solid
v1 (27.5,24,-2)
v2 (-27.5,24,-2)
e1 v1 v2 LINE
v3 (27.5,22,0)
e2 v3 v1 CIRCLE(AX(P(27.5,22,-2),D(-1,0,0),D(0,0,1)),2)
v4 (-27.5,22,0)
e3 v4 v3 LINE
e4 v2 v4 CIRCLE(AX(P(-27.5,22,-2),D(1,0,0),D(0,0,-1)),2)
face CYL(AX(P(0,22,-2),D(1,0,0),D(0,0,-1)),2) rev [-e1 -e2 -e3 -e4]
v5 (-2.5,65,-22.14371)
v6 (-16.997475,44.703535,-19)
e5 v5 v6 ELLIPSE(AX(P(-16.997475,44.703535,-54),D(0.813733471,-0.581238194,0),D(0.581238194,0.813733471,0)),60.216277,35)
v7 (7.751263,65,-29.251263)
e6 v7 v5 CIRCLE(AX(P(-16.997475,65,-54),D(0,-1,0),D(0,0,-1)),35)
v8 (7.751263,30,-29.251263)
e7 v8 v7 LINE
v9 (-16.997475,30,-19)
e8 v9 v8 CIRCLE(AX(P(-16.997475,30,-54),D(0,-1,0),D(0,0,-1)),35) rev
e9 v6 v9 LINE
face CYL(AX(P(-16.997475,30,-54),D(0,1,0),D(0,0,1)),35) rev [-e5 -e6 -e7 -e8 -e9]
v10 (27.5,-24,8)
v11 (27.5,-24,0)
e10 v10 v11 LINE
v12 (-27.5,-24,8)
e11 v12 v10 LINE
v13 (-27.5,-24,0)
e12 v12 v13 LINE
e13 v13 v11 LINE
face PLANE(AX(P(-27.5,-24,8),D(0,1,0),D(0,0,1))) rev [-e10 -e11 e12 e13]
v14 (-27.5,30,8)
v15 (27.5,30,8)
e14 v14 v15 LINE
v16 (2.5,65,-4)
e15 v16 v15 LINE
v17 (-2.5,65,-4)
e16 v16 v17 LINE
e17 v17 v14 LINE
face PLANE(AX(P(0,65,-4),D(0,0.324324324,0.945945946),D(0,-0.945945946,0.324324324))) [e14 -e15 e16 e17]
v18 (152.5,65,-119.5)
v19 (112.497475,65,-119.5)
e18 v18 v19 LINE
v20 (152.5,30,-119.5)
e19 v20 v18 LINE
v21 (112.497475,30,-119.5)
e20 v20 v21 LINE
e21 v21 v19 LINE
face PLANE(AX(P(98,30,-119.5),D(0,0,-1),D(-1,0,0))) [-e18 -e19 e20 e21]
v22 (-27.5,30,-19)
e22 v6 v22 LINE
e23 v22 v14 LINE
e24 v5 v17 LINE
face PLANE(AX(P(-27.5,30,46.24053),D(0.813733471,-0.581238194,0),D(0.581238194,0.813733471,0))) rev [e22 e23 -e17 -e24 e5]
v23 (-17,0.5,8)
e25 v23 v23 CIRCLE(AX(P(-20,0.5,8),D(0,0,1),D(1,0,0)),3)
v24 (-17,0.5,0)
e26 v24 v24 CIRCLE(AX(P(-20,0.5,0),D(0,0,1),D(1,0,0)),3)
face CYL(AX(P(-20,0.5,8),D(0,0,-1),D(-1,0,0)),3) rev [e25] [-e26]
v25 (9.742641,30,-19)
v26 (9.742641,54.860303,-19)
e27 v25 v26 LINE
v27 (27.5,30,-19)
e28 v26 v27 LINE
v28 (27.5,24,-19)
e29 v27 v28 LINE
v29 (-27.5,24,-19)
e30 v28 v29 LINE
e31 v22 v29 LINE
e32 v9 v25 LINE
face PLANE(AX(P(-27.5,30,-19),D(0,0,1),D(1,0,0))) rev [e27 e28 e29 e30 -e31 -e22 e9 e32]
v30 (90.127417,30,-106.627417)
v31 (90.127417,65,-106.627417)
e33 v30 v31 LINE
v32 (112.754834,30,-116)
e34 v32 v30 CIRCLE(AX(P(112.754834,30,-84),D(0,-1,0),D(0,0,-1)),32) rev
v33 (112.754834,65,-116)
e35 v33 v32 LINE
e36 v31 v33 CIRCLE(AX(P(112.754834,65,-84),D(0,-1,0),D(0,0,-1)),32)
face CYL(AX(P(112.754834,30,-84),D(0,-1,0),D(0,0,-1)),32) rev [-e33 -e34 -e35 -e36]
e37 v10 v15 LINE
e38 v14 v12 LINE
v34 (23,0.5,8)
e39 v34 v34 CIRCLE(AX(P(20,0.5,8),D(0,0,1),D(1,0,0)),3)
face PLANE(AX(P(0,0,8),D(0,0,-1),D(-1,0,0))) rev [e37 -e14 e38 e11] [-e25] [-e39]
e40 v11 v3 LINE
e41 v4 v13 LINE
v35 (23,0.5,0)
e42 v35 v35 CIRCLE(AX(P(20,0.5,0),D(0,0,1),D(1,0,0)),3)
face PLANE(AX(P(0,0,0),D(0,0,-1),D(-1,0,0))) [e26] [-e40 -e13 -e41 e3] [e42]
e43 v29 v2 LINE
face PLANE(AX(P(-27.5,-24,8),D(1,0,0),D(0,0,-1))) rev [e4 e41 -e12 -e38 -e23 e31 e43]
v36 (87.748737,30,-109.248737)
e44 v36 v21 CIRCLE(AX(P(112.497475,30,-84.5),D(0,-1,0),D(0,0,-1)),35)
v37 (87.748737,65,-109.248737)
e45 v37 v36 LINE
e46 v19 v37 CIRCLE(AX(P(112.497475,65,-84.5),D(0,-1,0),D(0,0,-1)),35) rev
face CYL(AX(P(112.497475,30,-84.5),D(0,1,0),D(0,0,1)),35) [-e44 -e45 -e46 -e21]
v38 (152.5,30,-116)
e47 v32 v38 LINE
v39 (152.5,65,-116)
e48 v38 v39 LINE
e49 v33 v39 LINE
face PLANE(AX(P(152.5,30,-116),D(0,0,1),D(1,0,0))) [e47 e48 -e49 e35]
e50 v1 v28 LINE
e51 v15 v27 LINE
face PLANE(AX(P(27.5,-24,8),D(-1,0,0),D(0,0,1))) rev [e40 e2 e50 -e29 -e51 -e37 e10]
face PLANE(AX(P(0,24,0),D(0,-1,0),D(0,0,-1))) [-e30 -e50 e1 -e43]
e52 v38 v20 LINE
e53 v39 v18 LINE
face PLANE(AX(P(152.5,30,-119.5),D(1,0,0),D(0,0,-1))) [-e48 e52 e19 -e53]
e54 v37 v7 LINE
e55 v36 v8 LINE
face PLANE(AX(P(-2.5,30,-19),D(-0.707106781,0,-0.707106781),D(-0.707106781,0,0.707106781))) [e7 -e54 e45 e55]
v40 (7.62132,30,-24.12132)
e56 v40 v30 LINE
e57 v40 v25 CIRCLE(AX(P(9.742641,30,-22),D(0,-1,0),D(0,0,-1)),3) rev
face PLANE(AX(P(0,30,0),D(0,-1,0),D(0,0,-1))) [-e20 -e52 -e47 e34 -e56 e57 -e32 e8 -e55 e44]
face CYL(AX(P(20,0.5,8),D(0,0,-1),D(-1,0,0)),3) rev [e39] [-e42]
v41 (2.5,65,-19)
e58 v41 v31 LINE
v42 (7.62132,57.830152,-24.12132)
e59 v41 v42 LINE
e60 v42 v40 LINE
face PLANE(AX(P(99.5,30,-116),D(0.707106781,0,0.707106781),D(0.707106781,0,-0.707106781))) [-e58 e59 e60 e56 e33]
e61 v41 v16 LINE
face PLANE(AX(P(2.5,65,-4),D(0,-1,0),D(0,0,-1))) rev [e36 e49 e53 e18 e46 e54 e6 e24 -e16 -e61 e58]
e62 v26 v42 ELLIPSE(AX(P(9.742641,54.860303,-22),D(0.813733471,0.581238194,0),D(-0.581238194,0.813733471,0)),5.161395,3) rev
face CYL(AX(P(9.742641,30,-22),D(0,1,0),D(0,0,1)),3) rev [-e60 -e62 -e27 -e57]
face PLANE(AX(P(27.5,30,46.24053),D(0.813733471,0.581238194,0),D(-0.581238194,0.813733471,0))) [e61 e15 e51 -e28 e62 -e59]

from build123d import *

# Parameters (mm, degrees)
SKETCH1_W           = 55
SKETCH1_H           = 48
SKETCH1_R           = 3
BOSS_EXTRUDE1_DEPTH = 8
SKETCH2_W           = 55
SKETCH2_H           = 27
BOSS_EXTRUDE2_DEPTH = 6
SKETCH3_W           = 15
SKETCH3_H           = 35
BOSS_EXTRUDE3_DEPTH = 2.5
FILLET1_R           = 2
RIB1_REACH          = 75.091
SKETCH4_WALL_W      = 185.181394164
SKETCH4_WALL_H      = 5
BOSS_EXTRUDE5_REACH = 77.566
BOSS_EXTRUDE6_DEPTH = 35
FILLET3_R           = 35
FILLET4_R           = 32
FILLET5_R           = 35
FILLET6_R           = 3


with BuildPart() as part:
    # Sketch1 → Boss-Extrude1 (new body)
    with BuildSketch(Plane.XY):
        Rectangle(SKETCH1_W, SKETCH1_H)
        with Locations((20, 0.5)):
            Circle(SKETCH1_R, mode=Mode.SUBTRACT)
        with Locations((-20, 0.5)):
            Circle(SKETCH1_R, mode=Mode.SUBTRACT)
    extrude(amount=BOSS_EXTRUDE1_DEPTH)

    # Sketch2 → Boss-Extrude2 (add)
    with BuildSketch(Plane(origin=(0, 24, 0), x_dir=(1, 0, 0), z_dir=(0, 1, 0))):
        with Locations((0, 5.5)):
            Rectangle(SKETCH2_W, SKETCH2_H)
    extrude(amount=BOSS_EXTRUDE2_DEPTH)

    # Sketch3 → Boss-Extrude3 (add, symmetric)
    with BuildSketch(Plane(origin=(0, 0, 0), x_dir=(0, 0, -1), z_dir=(1, 0, 0))):
        with Locations((11.5, 47.5)):
            Rectangle(SKETCH3_W, SKETCH3_H)
    extrude(amount=BOSS_EXTRUDE3_DEPTH, both=True)

    # Fillet1
    fillet1_edges = [part.edges().sort_by_distance(p)[0] for p in [
        (0, 24, 0),
    ]]
    fillet(fillet1_edges, radius=FILLET1_R)

    # Sketch4 wall → Rib1 (add, up to next)
    with BuildSketch(Plane(origin=(0, 47.5, 2), x_dir=(0, -0.945945945946, 0.324324324324), z_dir=(0, -0.324324324324, -0.945945945946)), mode=Mode.PRIVATE) as rib1_sk1:
        Rectangle(SKETCH4_WALL_W, SKETCH4_WALL_H)
    rib1_tool1 = extrude(rib1_sk1.sketch, amount=RIB1_REACH, mode=Mode.PRIVATE) - part.part
    add(rib1_tool1.solids().sort_by_distance((0, 47.5, 2))[0])

    # Boss-Extrude5: up to this plane
    boss_extrude5_end = Plane(origin=(0, 65, -4), z_dir=(0, 0.3243243243243244, 0.945945945945946))
    # Sketch5 → Boss-Extrude5 (add, up to the surface)
    with BuildSketch(Plane(origin=(0, 0, -19), x_dir=(-1, 0, 0), z_dir=(0, 0, -1)), mode=Mode.PRIVATE) as boss_extrude5_sk1:
        Polygon((-27.5, 30), (-2.5, 65), (-2.5, 30), align=None)
    boss_extrude5_tool1 = split(extrude(boss_extrude5_sk1.sketch, amount=-BOSS_EXTRUDE5_REACH, mode=Mode.PRIVATE), bisect_by=boss_extrude5_end, keep=Keep.BOTH, mode=Mode.PRIVATE)
    boss_extrude5 = boss_extrude5_tool1.solids().sort_by_distance((10.833333, 41.666667, -19))[0]
    add(boss_extrude5)

    # Mirror1: Boss-Extrude5 across plane
    add(boss_extrude5.mirror(Plane(origin=(0, 0, 0), x_dir=(0, 0, 1), z_dir=(1, 0, 0))))

    # Sketch7 → Boss-Extrude6 (add)
    with BuildSketch(Plane(origin=(0, 65, 0), x_dir=(1, 0, 0), z_dir=(0, 1, 0))):
        Polygon((2.5, 19), (-2.5, 19), (98, 119.5), (152.5, 119.5), (152.5, 116), (99.5, 116), align=None)
    extrude(amount=-BOSS_EXTRUDE6_DEPTH)

    # Fillet3
    fillet3_edges = [part.edges().sort_by_distance(p)[0] for p in [
        (98, 47.5, -119.5),
    ]]
    fillet(fillet3_edges, radius=FILLET3_R)

    # Fillet4
    fillet4_edges = [part.edges().sort_by_distance(p)[0] for p in [
        (99.5, 47.5, -116),
    ]]
    fillet(fillet4_edges, radius=FILLET4_R)

    # Fillet5
    fillet5_edges = [part.edges().sort_by_distance(p)[0] for p in [
        (-2.5, 47.5, -19),
    ]]
    fillet(fillet5_edges, radius=FILLET5_R)

    # Fillet6
    # the kernel refuses this fillet: 3 mm, written as the material it adds along each edge
    with BuildSketch(Plane(origin=(2.5, 65, -19), x_dir=(1, 0, 0), z_dir=(0, -1, 0))) as fillet6_piece_1_section:
        with BuildLine():
            CenterArc((FILLET6_R * 2.41421356237, -FILLET6_R), FILLET6_R, 90, 135)
            Line((FILLET6_R * 1.70710678119, -FILLET6_R * 1.70710678119), (0, 0))
            Line((0, 0), (FILLET6_R * 2.41421356237, 0))
        make_face()
    fillet6_piece_1 = extrude(amount=35, mode=Mode.PRIVATE)
    fillet6_piece_1 = split(fillet6_piece_1, bisect_by=Plane(origin=(12.87170443, 50.479613798, -20.318339623), z_dir=(-0.813733471206735, -0.5812381937190964, 0)), keep=Keep.TOP, mode=Mode.PRIVATE)
    add(fillet6_piece_1)


solid = part.part
